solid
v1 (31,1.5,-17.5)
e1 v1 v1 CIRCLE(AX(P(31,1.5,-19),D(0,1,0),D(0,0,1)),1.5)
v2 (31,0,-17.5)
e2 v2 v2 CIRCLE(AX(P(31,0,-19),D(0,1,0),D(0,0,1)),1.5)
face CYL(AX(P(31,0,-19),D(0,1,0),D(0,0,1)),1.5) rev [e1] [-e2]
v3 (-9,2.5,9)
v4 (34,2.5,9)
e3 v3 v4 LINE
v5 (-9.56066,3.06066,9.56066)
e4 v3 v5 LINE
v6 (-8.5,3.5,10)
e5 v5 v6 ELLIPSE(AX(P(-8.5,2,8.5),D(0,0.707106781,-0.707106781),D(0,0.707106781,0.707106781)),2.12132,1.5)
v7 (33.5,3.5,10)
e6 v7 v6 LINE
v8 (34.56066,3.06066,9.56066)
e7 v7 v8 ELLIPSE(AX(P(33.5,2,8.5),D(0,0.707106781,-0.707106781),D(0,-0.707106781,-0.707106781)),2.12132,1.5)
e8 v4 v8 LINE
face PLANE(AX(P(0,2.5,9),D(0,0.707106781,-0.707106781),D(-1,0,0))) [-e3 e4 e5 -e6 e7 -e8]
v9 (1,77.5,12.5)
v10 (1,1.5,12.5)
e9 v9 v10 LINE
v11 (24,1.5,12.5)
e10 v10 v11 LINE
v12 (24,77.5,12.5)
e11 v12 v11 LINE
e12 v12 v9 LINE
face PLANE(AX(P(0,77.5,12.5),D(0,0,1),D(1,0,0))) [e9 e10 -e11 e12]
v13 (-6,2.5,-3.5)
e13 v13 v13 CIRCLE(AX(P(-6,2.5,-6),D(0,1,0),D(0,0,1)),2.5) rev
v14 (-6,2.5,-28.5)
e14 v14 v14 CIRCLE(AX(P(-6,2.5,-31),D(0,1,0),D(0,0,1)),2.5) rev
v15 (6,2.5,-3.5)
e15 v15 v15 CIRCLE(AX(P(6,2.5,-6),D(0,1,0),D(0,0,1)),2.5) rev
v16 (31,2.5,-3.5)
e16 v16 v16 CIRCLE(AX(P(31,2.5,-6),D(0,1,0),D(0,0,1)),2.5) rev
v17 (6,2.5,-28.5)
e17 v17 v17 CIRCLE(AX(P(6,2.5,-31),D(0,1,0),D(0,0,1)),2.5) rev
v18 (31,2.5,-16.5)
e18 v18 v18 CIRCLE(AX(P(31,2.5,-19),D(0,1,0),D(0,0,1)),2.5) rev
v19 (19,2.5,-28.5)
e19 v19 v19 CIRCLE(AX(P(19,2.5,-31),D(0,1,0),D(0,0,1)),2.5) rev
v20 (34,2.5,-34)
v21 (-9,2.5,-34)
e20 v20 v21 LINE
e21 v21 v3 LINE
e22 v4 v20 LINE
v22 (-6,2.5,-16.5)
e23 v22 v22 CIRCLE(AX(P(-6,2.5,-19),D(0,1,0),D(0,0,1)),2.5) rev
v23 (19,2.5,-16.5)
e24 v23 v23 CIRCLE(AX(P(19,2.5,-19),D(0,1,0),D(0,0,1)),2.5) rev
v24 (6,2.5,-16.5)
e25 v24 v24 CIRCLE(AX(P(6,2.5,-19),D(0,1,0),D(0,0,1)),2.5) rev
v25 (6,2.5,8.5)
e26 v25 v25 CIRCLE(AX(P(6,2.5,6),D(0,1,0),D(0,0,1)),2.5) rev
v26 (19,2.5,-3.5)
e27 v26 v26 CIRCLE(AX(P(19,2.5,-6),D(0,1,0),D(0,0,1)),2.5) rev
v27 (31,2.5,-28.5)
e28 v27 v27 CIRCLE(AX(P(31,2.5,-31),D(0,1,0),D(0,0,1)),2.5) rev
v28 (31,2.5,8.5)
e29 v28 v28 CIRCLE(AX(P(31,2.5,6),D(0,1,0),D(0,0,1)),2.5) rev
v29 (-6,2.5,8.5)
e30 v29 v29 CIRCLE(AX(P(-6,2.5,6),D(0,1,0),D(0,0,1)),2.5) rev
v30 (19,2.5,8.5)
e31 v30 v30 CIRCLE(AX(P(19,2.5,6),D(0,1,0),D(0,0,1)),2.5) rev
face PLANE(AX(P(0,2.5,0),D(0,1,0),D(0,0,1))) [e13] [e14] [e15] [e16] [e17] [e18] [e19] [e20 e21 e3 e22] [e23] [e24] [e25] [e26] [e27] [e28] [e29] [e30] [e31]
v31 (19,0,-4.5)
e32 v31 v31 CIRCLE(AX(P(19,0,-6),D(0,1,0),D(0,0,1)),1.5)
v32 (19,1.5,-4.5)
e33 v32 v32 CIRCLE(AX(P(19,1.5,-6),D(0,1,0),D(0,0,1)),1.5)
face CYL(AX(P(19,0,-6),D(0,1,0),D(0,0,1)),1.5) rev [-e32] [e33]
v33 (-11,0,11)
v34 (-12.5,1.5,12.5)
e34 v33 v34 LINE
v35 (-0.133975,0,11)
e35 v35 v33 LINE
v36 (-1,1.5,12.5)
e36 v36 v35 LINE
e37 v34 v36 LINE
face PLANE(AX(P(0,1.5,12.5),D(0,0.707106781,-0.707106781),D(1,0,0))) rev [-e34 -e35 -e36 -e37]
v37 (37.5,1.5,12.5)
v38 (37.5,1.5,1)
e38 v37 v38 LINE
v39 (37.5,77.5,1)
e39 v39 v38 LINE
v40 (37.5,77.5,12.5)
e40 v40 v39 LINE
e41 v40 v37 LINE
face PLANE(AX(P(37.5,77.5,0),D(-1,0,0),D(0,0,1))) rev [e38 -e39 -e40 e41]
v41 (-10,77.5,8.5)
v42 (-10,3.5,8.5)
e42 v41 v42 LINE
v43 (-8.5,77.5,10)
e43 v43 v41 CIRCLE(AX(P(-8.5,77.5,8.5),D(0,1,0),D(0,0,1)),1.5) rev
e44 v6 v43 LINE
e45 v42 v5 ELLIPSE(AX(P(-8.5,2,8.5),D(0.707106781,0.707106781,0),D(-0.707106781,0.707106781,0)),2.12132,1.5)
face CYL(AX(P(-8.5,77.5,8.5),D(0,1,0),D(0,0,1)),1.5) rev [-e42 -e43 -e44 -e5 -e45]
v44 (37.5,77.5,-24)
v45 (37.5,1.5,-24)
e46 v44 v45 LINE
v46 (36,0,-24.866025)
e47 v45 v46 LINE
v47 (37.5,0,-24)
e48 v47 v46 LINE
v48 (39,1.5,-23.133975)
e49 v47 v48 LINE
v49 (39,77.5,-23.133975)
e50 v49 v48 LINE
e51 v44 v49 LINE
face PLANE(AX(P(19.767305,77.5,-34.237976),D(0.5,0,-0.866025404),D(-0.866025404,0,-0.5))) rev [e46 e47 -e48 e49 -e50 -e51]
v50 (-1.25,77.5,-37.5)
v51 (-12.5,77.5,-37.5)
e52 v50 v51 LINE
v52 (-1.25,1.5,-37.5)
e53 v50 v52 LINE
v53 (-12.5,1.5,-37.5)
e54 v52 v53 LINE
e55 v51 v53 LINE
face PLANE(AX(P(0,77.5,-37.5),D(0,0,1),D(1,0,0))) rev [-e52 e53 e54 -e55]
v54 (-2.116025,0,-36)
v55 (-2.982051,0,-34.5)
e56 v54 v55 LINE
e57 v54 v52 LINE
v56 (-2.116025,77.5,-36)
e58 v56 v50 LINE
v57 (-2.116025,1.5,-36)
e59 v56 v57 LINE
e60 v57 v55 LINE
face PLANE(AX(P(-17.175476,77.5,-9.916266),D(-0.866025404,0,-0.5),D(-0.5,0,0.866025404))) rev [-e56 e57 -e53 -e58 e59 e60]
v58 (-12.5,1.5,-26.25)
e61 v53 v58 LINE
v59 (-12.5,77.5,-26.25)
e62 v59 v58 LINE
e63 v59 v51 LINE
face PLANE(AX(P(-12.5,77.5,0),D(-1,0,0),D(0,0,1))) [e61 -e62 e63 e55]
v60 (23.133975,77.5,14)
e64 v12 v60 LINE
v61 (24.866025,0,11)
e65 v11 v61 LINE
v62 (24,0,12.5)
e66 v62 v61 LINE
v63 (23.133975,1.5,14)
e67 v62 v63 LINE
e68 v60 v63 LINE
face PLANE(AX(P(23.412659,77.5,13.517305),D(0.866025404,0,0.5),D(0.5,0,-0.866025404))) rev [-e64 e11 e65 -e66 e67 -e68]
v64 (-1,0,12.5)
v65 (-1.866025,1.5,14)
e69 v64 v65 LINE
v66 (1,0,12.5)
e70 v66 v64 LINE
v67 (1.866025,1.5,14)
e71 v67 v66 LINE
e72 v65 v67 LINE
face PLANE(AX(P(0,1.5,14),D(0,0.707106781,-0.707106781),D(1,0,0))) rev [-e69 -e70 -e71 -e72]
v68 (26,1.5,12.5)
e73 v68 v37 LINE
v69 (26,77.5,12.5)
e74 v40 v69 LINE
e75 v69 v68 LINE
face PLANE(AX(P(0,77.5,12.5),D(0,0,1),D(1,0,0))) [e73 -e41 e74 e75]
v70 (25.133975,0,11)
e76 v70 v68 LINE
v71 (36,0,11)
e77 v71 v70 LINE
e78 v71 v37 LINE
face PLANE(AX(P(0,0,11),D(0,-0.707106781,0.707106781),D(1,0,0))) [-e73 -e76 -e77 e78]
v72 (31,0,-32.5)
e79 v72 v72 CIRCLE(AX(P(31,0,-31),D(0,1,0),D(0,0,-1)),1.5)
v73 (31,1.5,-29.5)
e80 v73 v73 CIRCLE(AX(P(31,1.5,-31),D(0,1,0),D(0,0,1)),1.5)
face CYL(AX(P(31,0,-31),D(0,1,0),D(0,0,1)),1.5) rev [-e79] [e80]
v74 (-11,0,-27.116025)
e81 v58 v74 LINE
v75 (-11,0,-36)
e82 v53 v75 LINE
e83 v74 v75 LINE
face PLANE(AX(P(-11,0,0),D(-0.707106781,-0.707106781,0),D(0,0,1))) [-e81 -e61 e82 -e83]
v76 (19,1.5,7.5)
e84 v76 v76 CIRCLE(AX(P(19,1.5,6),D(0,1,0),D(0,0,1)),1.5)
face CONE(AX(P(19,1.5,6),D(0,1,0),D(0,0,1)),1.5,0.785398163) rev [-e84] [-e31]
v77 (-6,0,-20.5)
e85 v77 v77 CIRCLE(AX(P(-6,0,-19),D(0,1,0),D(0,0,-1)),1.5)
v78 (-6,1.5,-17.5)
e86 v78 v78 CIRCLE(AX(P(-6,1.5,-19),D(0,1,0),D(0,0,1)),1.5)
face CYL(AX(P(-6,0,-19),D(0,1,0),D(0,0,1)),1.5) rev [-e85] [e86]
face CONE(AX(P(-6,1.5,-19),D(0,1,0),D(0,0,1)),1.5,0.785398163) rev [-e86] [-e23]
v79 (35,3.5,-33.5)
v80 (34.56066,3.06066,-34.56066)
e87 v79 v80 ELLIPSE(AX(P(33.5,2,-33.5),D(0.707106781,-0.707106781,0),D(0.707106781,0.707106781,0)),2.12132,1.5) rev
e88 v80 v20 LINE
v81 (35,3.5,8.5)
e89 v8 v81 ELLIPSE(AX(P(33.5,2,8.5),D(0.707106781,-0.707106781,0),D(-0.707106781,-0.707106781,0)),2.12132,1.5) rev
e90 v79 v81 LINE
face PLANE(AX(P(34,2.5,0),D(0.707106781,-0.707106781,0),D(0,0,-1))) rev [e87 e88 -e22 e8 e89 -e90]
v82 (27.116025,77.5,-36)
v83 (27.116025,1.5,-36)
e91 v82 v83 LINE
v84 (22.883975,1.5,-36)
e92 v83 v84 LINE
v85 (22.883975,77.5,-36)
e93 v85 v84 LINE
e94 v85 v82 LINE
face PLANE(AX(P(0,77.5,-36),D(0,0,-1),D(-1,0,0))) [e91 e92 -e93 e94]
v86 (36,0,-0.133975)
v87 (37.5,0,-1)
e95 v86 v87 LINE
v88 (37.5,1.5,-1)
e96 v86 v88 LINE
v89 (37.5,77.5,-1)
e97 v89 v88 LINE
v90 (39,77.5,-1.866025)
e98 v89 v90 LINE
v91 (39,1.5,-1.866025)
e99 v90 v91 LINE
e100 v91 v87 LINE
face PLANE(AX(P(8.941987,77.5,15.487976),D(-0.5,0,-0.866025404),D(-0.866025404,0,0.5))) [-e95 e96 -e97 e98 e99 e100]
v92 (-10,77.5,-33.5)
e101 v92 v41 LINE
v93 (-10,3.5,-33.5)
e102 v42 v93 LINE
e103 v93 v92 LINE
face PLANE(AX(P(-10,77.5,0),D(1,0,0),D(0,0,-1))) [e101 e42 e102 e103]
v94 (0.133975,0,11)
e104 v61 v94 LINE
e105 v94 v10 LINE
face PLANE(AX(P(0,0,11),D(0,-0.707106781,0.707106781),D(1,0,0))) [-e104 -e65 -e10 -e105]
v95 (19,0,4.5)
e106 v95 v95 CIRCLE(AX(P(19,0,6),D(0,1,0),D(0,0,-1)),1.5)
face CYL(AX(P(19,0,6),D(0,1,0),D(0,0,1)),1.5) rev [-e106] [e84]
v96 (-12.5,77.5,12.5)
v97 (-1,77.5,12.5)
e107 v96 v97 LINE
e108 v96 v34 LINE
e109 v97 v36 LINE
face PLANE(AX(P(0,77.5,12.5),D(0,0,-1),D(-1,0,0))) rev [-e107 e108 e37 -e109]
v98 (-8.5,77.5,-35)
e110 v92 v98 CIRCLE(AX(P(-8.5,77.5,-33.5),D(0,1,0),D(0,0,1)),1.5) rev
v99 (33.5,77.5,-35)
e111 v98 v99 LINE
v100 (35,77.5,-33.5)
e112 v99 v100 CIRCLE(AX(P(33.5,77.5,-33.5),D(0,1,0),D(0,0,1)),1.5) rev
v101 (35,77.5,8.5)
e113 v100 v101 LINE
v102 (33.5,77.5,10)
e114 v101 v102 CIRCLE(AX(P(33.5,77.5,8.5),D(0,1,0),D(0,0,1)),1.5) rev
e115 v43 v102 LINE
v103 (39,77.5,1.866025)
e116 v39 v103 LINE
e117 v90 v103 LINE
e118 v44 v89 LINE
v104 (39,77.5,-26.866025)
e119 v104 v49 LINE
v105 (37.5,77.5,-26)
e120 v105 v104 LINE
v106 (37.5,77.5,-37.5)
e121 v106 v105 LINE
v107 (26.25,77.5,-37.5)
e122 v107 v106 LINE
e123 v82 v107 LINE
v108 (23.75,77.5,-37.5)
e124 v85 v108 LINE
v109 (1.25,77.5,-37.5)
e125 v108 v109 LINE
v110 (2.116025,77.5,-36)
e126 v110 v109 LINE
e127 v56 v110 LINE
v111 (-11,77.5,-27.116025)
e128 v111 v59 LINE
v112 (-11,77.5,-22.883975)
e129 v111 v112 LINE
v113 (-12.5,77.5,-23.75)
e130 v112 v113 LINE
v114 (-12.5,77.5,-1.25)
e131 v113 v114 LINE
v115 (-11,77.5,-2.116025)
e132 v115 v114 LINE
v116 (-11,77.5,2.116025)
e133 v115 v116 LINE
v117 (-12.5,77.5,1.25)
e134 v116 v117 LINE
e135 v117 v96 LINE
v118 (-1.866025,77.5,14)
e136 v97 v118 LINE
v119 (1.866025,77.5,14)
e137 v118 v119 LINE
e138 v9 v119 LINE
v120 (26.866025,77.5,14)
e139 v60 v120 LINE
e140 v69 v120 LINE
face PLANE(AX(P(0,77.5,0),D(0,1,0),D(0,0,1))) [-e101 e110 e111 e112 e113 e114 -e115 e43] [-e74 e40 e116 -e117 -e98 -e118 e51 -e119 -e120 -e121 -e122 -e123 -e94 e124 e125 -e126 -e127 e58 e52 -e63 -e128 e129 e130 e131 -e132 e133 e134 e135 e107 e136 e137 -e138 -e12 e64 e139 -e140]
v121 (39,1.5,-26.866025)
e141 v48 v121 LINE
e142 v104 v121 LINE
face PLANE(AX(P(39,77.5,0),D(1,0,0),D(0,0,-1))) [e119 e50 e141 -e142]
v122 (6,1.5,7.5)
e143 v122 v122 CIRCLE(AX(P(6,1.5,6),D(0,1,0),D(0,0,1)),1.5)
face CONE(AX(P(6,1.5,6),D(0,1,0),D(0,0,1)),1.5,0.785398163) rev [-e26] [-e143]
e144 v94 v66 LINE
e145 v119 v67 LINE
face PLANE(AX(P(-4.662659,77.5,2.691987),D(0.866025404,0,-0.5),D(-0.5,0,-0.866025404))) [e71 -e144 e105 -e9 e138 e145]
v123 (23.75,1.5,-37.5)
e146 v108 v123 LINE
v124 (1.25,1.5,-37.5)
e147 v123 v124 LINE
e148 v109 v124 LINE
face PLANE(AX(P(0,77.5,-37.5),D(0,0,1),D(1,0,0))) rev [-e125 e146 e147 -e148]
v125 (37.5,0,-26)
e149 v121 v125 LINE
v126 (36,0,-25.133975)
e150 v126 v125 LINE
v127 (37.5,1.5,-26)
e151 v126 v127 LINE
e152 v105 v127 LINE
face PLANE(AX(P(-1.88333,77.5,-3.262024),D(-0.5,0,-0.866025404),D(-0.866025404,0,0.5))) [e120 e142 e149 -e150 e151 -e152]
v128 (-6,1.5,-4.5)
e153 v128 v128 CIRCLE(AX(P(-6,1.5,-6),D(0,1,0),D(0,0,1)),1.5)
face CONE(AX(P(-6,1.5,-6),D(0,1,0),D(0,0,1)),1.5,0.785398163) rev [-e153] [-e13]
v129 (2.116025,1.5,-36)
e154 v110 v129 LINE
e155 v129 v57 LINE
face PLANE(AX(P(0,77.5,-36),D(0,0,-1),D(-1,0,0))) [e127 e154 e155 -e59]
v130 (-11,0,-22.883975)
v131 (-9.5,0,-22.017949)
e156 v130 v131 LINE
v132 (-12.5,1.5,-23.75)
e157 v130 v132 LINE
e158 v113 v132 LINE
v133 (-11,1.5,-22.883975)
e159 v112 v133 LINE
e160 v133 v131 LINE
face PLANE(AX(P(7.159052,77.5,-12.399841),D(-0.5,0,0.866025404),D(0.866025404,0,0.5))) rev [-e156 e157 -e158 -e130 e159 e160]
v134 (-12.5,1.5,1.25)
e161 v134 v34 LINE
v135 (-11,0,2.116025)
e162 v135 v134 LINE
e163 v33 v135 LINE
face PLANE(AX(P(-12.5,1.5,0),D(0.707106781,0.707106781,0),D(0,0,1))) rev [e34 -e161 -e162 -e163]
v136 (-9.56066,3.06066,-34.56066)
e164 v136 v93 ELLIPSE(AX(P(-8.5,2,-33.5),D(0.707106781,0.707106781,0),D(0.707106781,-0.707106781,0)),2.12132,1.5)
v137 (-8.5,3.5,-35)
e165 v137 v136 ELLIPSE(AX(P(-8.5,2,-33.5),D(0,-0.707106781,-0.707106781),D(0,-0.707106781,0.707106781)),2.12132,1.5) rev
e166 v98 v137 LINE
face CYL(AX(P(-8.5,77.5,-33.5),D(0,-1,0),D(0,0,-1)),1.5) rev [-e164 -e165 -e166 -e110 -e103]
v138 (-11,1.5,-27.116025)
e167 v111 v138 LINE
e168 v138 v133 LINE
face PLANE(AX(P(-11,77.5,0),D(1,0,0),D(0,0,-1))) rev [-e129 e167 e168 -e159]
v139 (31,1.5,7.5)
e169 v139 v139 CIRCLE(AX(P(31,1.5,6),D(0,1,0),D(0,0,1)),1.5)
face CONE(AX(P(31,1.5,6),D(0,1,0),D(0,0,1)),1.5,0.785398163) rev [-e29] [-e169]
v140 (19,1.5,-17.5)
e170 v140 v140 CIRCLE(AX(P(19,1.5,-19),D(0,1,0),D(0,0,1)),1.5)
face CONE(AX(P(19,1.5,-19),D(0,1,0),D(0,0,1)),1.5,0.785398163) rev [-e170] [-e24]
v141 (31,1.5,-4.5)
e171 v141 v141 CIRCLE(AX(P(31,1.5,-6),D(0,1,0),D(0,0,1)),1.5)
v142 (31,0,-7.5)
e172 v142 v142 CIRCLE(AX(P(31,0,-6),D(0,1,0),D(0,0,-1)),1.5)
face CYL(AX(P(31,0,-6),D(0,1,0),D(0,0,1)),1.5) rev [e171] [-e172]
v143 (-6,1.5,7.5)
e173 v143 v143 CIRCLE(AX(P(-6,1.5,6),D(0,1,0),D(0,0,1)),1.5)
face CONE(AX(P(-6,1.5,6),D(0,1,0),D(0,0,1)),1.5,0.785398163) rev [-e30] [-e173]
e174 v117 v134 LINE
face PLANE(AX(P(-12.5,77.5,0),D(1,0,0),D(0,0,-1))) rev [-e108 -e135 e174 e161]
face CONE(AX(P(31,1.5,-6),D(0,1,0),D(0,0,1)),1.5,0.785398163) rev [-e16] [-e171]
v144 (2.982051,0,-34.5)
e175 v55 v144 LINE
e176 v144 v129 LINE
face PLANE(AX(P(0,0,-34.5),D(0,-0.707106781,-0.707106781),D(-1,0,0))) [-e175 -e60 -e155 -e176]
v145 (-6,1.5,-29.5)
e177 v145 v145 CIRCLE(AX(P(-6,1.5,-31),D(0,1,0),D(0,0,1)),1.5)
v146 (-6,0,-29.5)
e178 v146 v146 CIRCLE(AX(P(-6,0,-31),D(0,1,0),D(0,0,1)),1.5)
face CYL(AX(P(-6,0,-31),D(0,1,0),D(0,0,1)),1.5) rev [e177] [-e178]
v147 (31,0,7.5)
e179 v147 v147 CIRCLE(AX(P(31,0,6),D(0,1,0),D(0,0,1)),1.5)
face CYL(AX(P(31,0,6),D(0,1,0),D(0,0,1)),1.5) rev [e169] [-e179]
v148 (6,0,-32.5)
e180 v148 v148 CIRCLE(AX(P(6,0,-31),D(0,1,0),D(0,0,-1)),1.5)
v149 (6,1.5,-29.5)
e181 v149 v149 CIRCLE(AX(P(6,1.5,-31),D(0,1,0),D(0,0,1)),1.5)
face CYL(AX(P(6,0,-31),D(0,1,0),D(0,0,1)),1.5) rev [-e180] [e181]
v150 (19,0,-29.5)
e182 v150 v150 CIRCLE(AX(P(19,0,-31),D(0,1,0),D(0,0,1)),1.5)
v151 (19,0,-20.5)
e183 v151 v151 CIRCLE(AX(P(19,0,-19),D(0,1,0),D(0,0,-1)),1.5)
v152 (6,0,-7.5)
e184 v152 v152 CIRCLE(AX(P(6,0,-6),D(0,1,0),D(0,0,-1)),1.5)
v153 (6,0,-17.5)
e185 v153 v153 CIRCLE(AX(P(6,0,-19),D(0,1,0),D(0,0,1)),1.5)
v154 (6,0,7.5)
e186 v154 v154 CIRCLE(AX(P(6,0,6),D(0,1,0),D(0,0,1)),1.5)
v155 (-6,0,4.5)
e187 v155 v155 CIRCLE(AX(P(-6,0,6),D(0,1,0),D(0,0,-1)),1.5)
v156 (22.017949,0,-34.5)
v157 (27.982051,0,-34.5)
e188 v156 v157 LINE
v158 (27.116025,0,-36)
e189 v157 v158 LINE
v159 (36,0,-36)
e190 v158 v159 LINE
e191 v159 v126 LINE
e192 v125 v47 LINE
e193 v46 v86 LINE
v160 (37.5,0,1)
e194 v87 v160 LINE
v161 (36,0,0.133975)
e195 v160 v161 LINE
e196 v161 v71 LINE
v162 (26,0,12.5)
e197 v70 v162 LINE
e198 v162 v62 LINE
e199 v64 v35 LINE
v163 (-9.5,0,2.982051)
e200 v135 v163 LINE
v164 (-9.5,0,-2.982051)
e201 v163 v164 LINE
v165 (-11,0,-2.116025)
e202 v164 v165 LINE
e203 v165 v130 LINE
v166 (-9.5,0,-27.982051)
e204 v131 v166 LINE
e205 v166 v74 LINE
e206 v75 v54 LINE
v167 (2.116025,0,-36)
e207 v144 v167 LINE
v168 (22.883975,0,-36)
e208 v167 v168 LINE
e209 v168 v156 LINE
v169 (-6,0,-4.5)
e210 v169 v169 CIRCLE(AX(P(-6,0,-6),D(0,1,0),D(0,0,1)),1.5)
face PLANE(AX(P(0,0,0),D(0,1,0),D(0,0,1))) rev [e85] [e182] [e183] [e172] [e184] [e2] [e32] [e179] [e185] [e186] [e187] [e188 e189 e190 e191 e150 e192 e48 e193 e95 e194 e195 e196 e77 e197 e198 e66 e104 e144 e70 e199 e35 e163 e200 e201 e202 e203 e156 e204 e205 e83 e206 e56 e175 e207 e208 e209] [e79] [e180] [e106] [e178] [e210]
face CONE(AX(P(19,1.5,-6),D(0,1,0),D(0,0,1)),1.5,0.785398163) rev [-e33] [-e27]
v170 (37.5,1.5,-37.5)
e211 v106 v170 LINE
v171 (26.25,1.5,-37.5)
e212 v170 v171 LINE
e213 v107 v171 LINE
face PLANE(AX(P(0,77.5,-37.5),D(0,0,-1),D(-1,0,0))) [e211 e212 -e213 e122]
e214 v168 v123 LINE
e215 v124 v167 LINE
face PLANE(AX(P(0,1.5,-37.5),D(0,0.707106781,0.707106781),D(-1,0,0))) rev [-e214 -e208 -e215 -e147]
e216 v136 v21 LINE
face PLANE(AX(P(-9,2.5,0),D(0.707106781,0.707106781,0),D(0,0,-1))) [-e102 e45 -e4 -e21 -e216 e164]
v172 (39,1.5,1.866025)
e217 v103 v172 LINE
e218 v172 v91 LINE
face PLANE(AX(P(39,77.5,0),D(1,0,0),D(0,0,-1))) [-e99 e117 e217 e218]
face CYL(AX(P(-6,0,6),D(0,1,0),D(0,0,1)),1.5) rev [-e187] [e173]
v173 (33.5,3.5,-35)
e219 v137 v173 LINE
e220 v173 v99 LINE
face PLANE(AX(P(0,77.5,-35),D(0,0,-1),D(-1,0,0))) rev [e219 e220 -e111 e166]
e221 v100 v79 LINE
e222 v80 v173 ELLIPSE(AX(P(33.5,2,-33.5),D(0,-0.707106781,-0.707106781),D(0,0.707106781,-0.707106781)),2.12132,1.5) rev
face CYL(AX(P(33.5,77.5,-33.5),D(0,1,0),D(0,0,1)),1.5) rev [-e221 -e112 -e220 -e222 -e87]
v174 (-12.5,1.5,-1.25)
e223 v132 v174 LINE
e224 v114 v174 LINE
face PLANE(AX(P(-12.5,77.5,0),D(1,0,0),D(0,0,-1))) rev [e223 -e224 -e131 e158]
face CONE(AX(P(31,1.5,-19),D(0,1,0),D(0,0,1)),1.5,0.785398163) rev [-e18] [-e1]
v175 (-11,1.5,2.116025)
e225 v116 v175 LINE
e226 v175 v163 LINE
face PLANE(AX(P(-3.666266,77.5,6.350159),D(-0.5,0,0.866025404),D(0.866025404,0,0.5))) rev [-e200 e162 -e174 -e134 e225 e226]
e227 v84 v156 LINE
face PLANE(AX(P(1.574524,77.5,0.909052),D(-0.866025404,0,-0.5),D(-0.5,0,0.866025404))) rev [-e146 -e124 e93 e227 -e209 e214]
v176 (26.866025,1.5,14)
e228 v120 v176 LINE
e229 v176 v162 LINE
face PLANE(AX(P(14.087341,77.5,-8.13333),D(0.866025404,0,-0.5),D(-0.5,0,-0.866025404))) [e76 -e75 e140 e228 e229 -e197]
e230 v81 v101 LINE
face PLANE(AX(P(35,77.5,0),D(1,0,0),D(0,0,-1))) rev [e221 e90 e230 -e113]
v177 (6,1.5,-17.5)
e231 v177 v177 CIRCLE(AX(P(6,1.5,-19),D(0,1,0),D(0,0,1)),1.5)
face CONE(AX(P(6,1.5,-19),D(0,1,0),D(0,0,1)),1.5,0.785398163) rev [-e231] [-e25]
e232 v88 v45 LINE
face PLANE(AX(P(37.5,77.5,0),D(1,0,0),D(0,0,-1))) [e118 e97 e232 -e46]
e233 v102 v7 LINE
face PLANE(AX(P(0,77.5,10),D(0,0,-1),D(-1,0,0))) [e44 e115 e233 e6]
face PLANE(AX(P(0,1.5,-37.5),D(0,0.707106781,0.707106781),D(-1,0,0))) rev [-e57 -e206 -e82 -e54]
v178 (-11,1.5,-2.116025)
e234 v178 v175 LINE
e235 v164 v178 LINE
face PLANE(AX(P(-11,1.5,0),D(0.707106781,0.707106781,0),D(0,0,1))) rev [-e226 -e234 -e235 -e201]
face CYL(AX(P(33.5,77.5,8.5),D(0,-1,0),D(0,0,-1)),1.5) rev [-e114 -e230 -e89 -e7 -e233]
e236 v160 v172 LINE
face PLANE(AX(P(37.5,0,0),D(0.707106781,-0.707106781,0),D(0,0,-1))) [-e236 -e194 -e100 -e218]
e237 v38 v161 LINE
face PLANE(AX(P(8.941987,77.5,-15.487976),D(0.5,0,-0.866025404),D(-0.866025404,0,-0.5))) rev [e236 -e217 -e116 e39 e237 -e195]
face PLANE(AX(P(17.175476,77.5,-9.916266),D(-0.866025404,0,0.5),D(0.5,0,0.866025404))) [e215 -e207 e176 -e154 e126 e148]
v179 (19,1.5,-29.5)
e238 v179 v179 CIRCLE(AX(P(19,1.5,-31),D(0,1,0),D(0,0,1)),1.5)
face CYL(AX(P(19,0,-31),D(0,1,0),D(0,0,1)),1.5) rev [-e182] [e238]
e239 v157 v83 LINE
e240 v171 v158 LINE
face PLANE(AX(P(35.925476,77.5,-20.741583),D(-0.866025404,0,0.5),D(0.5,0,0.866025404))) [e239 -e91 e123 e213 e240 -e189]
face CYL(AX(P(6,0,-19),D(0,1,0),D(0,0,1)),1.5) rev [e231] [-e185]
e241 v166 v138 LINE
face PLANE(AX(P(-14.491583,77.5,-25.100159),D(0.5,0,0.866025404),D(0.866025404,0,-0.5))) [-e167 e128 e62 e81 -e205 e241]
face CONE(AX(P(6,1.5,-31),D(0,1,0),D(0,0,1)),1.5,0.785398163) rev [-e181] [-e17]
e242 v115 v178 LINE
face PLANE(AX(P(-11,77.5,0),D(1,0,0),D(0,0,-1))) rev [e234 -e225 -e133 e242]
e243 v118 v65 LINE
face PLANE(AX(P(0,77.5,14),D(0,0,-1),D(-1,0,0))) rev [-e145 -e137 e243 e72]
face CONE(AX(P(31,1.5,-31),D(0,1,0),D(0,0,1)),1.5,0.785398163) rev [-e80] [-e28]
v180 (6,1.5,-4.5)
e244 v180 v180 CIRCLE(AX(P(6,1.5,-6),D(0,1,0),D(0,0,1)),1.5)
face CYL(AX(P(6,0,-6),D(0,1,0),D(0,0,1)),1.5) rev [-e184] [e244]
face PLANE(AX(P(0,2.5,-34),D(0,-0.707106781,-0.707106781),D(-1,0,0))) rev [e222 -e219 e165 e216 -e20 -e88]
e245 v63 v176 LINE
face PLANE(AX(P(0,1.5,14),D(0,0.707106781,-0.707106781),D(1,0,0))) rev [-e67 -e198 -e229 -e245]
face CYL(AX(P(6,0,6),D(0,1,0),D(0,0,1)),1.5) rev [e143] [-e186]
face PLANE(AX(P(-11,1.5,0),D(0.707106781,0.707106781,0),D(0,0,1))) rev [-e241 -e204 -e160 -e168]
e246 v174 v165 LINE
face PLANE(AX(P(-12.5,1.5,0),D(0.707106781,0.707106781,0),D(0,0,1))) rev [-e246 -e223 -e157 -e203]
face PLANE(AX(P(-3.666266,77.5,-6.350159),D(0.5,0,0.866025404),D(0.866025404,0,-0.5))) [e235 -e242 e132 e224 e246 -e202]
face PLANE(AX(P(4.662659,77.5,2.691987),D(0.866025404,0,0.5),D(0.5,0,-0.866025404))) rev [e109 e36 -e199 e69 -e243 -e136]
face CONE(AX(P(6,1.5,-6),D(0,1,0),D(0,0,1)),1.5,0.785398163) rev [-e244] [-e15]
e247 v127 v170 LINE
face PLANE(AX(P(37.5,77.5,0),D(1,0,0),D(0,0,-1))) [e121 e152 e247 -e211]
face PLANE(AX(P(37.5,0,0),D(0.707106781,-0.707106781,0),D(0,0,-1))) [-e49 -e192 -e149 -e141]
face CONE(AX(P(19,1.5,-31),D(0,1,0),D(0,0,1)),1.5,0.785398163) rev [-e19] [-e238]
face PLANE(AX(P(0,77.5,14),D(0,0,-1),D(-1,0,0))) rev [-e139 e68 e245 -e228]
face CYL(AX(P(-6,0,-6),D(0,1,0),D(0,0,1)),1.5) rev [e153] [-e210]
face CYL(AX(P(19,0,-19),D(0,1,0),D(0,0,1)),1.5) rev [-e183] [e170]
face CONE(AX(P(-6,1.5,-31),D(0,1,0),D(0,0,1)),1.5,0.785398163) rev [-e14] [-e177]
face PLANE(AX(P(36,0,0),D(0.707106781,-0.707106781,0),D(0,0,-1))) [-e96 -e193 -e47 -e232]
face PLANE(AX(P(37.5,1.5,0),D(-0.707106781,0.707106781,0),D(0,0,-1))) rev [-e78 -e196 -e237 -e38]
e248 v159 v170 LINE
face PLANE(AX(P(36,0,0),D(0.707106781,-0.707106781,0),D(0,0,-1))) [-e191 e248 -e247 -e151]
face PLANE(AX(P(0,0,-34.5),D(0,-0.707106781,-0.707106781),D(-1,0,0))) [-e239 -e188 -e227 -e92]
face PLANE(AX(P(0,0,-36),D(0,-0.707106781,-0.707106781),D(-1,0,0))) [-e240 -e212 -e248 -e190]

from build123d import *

# Parameters (mm, degrees)
BOSS_EXTRUDE1_DEPTH     = 77.5
SKETCH2_W               = 45
SKETCH2_H               = 45
BOSS_EXTRUDE2_DEPTH     = 2.5
CUT_EXTRUDE1_DEPTH      = 93.478375851
CUT_EXTRUDE1_DEPTH_BACK = 93.478375851
SKETCH3_R               = 1.5
CHAMFER3_SIZE           = 1.5
CHAMFER2_SIZE           = 1
FILLET1_R               = 1.5


with BuildPart() as part:
    # Sketch1 → Boss-Extrude1 (new body)
    with BuildSketch(Plane(origin=(0, 0, 0), x_dir=(1, 0, 0), z_dir=(0, 1, 0))):
        Polygon((-11, 2.116025404), (-11, -2.116025404), (-12.5, -1.25), (-12.5, -12.5), (-1, -12.5), (-1.866025404, -14), (1.866025404, -14), (1, -12.5), (12.5, -12.5), (24, -12.5), (23.133974596, -14), (26.866025404, -14), (26, -12.5), (37.5, -12.5), (37.5, -1), (39, -1.866025404), (39, 1.866025404), (37.5, 1), (37.5, 12.5), (37.5, 24), (39, 23.133974596), (39, 26.866025404), (37.5, 26), (37.5, 37.5), (26.25, 37.5), (27.116025404, 36), (22.883974596, 36), (23.75, 37.5), (12.5, 37.5), (1.25, 37.5), (2.116025404, 36), (-2.116025404, 36), (-1.25, 37.5), (-12.5, 37.5), (-12.5, 26.25), (-11, 27.116025404), (-11, 22.883974596), (-12.5, 23.75), (-12.5, 12.5), (-12.5, 1.25), align=None)
        Polygon((-10, 10), (-10, -10), (10, -10), (15, -10), (35, -10), (35, 10), (35, 15), (35, 35), (15, 35), (10, 35), (-10, 35), (-10, 15), align=None, mode=Mode.SUBTRACT)
    extrude(amount=BOSS_EXTRUDE1_DEPTH)

    # Sketch2 → Boss-Extrude2 (add)
    with BuildSketch(Plane(origin=(0, 0, 0), x_dir=(1, 0, 0), z_dir=(0, 1, 0))):
        with Locations((12.5, 12.5)):
            Rectangle(SKETCH2_W, SKETCH2_H)
    extrude(amount=BOSS_EXTRUDE2_DEPTH)

    # Sketch3 → Cut-Extrude1 (cut, two sides: drawn at the far end of the back side and taken through both)
    with BuildSketch(Plane(origin=(0, 2.5, 0), x_dir=(1, 0, 0), z_dir=(0, 1, 0)).offset(-CUT_EXTRUDE1_DEPTH_BACK)):
        with Locations(Location((-6, 6, 0), (0, 0, 270))):
            Circle(SKETCH3_R)
        with Locations(Location((6, 6, 0), (0, 0, 270))):
            Circle(SKETCH3_R)
        with Locations(Location((6, -6, 0), (0, 0, 270))):
            Circle(SKETCH3_R)
        with Locations(Location((-6, -6, 0), (0, 0, 270))):
            Circle(SKETCH3_R)
        with Locations(Location((31, -6, 0), (0, 0, 270))):
            Circle(SKETCH3_R)
        with Locations(Location((19, -6, 0), (0, 0, 270))):
            Circle(SKETCH3_R)
        with Locations(Location((19, 6, 0), (0, 0, 270))):
            Circle(SKETCH3_R)
        with Locations(Location((31, 6, 0), (0, 0, 270))):
            Circle(SKETCH3_R)
        with Locations(Location((31, 19, 0), (0, 0, 270))):
            Circle(SKETCH3_R)
        with Locations(Location((19, 19, 0), (0, 0, 270))):
            Circle(SKETCH3_R)
        with Locations(Location((19, 31, 0), (0, 0, 270))):
            Circle(SKETCH3_R)
        with Locations(Location((31, 31, 0), (0, 0, 270))):
            Circle(SKETCH3_R)
        with Locations(Location((-6, 31, 0), (0, 0, 270))):
            Circle(SKETCH3_R)
        with Locations(Location((6, 31, 0), (0, 0, 270))):
            Circle(SKETCH3_R)
        with Locations(Location((6, 19, 0), (0, 0, 270))):
            Circle(SKETCH3_R)
        with Locations(Location((-6, 19, 0), (0, 0, 270))):
            Circle(SKETCH3_R)
    extrude(amount=CUT_EXTRUDE1_DEPTH + CUT_EXTRUDE1_DEPTH_BACK, mode=Mode.SUBTRACT)

    # Chamfer3
    chamfer3_edges = [part.edges().sort_by_distance(p)[0] for p in [
        (39, 0, -25),
        (0, 0, 14),
        (25, 0, 14),
        (39, 0, 0),
        (-11, 0, 0),
        (-11, 0, -25),
        (0, 0, -36),
        (25, 0, -36),
        (-12.5, 0, -12.5),
        (-12.5, 0, 6.875),
        (-6.75, 0, 12.5),
        (12.5, 0, 12.5),
        (31.75, 0, 12.5),
        (37.5, 0, 6.75),
        (37.5, 0, -12.5),
        (-12.5, 0, -31.875),
        (-6.875, 0, -37.5),
        (12.5, 0, -37.5),
        (37.5, 0, -31.75),
        (31.875, 0, -37.5),
    ]]
    chamfer(chamfer3_edges, length=CHAMFER3_SIZE - 0.0001)  # a hair under: the kernel refuses the full size

    # Chamfer2
    chamfer2_edges = [part.edges().sort_by_distance(p)[0] for p in [
        (12.5, 2.5, -35),
        (-10, 2.5, -12.5),
        (12.5, 2.5, 10),
        (35, 2.5, -12.5),
        (31, 2.5, -20.5),
        (31, 2.5, -7.5),
        (19, 2.5, -7.5),
        (19, 2.5, 4.5),
        (6, 2.5, -7.5),
        (6, 2.5, 4.5),
        (-6, 2.5, 4.5),
        (31, 2.5, 4.5),
        (-6, 2.5, -20.5),
        (6, 2.5, -20.5),
        (6, 2.5, -32.5),
        (19, 2.5, -20.5),
        (19, 2.5, -32.5),
        (31, 2.5, -32.5),
        (-6, 2.5, -32.5),
        (-6, 2.5, -7.5),
    ]]
    chamfer(chamfer2_edges, length=CHAMFER2_SIZE)

    # Fillet1
    fillet1_edges = [part.edges().sort_by_distance(p)[0] for p in [
        (35, 40.5, -35),
        (-10, 40.5, -35),
        (-10, 40.5, 10),
        (35, 40.5, 10),
    ]]
    fillet(fillet1_edges, radius=FILLET1_R)


solid = part.part
